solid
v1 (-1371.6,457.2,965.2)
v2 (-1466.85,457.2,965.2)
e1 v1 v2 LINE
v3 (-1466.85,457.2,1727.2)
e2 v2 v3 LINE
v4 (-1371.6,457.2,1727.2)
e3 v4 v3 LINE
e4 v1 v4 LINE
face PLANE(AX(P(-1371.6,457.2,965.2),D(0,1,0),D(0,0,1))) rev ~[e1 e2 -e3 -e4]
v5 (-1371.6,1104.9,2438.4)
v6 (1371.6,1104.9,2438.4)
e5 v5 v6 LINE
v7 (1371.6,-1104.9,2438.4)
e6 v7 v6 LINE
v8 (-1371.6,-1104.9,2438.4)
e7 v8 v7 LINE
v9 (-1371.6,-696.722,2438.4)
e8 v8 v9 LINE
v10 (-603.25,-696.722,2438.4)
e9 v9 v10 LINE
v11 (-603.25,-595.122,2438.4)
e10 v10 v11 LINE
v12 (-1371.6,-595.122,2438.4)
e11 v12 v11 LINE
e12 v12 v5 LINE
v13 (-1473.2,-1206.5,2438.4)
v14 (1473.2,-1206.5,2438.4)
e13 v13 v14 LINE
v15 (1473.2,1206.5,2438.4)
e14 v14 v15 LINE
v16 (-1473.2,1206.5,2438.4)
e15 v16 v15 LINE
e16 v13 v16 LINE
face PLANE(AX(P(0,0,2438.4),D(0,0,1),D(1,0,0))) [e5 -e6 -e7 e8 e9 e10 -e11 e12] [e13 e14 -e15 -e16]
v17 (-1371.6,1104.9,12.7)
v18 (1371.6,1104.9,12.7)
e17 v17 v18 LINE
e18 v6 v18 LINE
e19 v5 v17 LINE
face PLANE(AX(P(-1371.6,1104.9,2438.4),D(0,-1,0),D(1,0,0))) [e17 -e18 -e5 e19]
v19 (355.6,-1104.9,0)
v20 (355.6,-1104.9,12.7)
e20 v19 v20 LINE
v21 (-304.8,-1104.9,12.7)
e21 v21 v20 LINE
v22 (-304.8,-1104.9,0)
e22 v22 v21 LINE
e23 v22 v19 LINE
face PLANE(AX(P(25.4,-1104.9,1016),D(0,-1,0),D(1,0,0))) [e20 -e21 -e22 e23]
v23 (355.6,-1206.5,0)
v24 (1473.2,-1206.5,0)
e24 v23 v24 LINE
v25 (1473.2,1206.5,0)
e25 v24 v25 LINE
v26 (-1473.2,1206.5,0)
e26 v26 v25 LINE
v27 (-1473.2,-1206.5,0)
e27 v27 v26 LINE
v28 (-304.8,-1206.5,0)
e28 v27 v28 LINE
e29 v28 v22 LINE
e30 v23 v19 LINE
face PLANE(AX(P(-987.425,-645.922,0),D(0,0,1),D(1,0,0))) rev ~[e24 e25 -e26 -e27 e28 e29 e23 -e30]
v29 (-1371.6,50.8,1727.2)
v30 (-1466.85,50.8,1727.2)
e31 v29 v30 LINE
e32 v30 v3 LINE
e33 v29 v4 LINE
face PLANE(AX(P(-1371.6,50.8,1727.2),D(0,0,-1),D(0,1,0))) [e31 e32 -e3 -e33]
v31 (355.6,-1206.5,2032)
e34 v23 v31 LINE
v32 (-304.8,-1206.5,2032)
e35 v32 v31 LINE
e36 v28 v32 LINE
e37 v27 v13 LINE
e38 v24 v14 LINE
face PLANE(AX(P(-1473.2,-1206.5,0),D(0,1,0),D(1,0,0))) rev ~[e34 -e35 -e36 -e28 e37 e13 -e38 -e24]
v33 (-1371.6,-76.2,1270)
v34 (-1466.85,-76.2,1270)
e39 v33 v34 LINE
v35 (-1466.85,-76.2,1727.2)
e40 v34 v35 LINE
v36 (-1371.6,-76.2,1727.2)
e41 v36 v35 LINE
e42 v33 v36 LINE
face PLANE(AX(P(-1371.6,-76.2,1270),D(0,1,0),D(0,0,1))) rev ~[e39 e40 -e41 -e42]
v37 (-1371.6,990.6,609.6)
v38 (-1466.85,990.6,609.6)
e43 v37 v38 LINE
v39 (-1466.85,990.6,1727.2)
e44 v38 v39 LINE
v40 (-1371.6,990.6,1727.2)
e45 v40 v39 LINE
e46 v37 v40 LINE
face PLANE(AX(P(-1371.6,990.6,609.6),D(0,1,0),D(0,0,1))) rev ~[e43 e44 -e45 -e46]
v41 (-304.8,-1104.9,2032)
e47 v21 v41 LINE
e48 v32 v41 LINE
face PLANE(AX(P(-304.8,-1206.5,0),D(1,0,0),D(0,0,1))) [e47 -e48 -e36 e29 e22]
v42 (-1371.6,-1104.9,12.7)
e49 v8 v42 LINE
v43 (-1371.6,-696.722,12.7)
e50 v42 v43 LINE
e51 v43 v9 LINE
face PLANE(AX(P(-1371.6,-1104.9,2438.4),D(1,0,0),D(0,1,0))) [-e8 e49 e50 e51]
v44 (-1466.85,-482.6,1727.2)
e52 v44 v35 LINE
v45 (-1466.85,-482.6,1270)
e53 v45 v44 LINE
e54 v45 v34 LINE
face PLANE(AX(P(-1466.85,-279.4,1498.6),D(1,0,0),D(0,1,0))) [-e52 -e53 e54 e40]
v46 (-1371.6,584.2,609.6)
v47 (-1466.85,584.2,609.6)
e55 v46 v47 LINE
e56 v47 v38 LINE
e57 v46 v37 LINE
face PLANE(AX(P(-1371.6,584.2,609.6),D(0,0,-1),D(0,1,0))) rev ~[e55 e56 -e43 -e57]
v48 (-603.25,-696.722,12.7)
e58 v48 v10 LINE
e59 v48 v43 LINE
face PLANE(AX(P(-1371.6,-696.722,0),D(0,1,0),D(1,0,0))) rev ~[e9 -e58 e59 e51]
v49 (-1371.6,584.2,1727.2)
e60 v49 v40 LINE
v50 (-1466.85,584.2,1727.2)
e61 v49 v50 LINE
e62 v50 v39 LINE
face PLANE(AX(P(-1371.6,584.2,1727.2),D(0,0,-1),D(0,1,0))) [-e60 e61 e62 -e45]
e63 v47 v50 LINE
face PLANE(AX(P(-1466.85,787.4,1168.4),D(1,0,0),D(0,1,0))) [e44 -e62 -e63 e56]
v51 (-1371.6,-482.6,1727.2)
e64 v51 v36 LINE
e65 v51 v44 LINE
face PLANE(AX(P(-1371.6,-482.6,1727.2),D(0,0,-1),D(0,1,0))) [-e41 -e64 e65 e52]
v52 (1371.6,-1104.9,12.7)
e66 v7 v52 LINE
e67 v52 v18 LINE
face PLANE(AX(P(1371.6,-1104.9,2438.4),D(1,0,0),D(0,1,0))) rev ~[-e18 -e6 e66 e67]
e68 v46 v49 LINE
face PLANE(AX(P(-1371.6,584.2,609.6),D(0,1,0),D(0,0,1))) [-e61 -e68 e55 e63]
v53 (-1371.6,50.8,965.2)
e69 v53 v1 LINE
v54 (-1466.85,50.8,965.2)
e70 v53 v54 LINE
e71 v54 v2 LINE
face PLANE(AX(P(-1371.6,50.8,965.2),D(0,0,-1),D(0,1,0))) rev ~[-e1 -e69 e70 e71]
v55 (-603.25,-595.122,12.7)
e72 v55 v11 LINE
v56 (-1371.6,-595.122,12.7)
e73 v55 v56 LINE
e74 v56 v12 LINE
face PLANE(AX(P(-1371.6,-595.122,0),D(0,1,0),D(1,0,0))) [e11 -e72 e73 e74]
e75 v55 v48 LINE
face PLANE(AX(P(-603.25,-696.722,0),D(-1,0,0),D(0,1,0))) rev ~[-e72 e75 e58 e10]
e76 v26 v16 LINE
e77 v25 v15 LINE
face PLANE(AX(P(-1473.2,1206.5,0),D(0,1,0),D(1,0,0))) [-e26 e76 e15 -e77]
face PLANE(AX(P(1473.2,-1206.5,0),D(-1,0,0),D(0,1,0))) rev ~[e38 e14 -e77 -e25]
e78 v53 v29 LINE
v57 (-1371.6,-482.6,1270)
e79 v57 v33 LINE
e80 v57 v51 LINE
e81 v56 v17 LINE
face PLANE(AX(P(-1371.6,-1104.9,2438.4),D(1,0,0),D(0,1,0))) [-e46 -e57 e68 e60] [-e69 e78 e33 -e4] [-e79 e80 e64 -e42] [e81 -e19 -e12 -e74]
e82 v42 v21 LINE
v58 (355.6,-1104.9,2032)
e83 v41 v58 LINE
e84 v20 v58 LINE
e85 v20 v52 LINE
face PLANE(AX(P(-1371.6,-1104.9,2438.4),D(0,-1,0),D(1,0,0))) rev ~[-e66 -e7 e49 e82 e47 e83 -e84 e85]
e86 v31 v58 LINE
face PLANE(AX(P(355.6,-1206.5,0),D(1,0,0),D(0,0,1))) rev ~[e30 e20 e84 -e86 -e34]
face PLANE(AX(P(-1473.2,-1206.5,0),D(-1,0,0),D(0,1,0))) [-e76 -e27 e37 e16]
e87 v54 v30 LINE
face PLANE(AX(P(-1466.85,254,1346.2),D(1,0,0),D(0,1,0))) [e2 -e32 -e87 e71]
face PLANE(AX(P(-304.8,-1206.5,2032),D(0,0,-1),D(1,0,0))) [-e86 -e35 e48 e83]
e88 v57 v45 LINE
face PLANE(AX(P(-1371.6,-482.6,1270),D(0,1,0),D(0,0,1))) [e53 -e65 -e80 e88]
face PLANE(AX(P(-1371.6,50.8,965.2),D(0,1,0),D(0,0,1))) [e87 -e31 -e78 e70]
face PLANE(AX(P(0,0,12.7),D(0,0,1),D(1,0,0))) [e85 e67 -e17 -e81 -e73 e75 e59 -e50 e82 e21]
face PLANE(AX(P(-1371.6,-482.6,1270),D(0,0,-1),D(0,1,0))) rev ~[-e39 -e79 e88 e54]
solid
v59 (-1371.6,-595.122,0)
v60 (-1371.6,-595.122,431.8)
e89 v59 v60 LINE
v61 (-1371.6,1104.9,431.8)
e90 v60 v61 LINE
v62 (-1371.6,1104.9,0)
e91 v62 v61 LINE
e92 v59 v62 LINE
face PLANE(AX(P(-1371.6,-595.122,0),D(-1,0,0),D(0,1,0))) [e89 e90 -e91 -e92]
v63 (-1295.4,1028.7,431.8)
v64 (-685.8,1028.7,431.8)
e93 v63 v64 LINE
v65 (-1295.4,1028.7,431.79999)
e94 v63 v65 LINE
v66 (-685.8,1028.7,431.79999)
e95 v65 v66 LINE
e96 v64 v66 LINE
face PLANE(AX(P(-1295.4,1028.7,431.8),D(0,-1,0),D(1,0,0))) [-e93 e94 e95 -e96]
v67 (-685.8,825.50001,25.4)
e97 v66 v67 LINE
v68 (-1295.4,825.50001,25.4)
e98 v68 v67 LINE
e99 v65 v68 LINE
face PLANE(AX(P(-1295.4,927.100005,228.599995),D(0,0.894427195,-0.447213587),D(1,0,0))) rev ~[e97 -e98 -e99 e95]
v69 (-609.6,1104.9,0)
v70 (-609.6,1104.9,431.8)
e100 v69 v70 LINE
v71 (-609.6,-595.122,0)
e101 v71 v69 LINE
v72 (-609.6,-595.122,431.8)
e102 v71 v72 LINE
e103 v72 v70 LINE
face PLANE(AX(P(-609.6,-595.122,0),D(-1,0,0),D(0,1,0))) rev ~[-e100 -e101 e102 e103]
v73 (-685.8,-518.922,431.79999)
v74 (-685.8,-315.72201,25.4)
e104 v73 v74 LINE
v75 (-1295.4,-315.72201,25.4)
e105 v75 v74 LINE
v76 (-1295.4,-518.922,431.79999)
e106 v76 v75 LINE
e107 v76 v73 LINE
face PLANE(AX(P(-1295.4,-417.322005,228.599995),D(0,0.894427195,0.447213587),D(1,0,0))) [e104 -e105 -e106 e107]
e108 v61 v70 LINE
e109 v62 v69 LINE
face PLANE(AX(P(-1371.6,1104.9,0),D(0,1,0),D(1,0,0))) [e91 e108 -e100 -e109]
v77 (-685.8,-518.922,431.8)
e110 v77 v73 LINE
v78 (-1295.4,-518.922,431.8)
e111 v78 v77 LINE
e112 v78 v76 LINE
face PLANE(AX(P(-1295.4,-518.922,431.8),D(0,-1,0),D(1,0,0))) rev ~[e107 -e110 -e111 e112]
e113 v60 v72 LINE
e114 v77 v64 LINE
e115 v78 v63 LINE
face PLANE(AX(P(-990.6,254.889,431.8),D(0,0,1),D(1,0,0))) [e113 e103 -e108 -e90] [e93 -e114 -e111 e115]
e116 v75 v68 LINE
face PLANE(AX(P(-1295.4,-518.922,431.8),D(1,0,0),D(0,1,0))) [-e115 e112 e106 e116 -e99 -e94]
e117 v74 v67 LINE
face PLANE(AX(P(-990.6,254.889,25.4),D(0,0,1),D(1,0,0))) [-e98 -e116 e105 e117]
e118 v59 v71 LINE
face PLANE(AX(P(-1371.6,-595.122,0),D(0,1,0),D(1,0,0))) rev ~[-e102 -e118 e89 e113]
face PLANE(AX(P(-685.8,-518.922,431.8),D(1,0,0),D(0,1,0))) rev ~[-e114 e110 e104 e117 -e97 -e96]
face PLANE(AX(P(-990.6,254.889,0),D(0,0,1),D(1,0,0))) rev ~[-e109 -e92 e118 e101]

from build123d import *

# Parameters (mm, degrees)
F0_W      = 2946.4
F0_H      = 2413
F1_DEPTH  = 2438.4
F2_W      = 2743.2
F2_H      = 2209.8
F3_DEPTH  = 2425.7
F4_W      = 762
F4_H      = 1700.022
F5_DEPTH  = 431.8
F6_W      = 609.6
F6_H      = 1547.622
F7_DEPTH  = 406.4
F8_SIZE2  = 203.19999
F8_SIZE   = 406.39999
F9_W      = 768.35
F9_H      = 101.6
F10_DEPTH = 2438.4
F11_W     = 660.4
F11_H     = 2032
F12_DEPTH = 101.6
F13_W     = 406.4
F13_H     = 1117.6
F13_H_2   = 762
F13_H_3   = 457.2
F14_DEPTH = 95.25


# Not quite as in the source:
# - a fillet or chamfer is up to 0.001 mm smaller than in the source, because OpenCascade refuses the exact size


with BuildPart() as f1:
    # F0 (on Top) → F1 (new body)
    with BuildSketch(Plane.XY):
        Rectangle(F0_W, F0_H)
    extrude(amount=F1_DEPTH)

    # F2 (on face) → F3 (cut)
    with BuildSketch(Plane.XY.offset(2438.4)):
        Rectangle(F2_W, F2_H)
    extrude(amount=-F3_DEPTH, mode=Mode.SUBTRACT)

    # F9 (on Top) → F10 (join)
    with BuildSketch(Plane.XY):
        with Locations((-987.425, -645.922)):
            Rectangle(F9_W, F9_H)
    extrude(amount=F10_DEPTH)

    # F11 (on face) → F12 (cut)
    with BuildSketch(Plane.XZ.offset(1206.5)):
        with Locations((25.4, 1016)):
            Rectangle(F11_W, F11_H)
    extrude(amount=-F12_DEPTH, mode=Mode.SUBTRACT)

    # F13 (on face) → F14 (cut)
    with BuildSketch(Plane.YZ.offset(-1371.6)):
        with Locations((787.4, 1168.4)):
            Rectangle(F13_W, F13_H)
        with Locations((254, 1346.2)):
            Rectangle(F13_W, F13_H_2)
        with Locations((-279.4, 1498.6)):
            Rectangle(F13_W, F13_H_3)
    extrude(amount=-F14_DEPTH, mode=Mode.SUBTRACT)


with BuildPart() as f5:
    # F4 (on Top) → F5 (new body)
    with BuildSketch(Plane.XY):
        with Locations((-990.6, 254.889)):
            Rectangle(F4_W, F4_H)
    extrude(amount=F5_DEPTH)

    # F6 (on face) → F7 (cut)
    with BuildSketch(Plane.XY.offset(431.8)):
        with Locations((-990.6, 254.889)):
            Rectangle(F6_W, F6_H)
    extrude(amount=-F7_DEPTH, mode=Mode.SUBTRACT)

    # F8 (size 406.4 and 203.2 in the source; OpenCascade refuses exactly that, so slightly less here)
    f8_edges = [f5.edges().sort_by_distance(p)[0] for p in [
        (-990.6, 1028.7, 25.4),
        (-990.6, -518.922, 25.4),
    ]]
    chamfer(f8_edges, length=F8_SIZE, length2=F8_SIZE2)


solid = Compound([f1.part, f5.part])
